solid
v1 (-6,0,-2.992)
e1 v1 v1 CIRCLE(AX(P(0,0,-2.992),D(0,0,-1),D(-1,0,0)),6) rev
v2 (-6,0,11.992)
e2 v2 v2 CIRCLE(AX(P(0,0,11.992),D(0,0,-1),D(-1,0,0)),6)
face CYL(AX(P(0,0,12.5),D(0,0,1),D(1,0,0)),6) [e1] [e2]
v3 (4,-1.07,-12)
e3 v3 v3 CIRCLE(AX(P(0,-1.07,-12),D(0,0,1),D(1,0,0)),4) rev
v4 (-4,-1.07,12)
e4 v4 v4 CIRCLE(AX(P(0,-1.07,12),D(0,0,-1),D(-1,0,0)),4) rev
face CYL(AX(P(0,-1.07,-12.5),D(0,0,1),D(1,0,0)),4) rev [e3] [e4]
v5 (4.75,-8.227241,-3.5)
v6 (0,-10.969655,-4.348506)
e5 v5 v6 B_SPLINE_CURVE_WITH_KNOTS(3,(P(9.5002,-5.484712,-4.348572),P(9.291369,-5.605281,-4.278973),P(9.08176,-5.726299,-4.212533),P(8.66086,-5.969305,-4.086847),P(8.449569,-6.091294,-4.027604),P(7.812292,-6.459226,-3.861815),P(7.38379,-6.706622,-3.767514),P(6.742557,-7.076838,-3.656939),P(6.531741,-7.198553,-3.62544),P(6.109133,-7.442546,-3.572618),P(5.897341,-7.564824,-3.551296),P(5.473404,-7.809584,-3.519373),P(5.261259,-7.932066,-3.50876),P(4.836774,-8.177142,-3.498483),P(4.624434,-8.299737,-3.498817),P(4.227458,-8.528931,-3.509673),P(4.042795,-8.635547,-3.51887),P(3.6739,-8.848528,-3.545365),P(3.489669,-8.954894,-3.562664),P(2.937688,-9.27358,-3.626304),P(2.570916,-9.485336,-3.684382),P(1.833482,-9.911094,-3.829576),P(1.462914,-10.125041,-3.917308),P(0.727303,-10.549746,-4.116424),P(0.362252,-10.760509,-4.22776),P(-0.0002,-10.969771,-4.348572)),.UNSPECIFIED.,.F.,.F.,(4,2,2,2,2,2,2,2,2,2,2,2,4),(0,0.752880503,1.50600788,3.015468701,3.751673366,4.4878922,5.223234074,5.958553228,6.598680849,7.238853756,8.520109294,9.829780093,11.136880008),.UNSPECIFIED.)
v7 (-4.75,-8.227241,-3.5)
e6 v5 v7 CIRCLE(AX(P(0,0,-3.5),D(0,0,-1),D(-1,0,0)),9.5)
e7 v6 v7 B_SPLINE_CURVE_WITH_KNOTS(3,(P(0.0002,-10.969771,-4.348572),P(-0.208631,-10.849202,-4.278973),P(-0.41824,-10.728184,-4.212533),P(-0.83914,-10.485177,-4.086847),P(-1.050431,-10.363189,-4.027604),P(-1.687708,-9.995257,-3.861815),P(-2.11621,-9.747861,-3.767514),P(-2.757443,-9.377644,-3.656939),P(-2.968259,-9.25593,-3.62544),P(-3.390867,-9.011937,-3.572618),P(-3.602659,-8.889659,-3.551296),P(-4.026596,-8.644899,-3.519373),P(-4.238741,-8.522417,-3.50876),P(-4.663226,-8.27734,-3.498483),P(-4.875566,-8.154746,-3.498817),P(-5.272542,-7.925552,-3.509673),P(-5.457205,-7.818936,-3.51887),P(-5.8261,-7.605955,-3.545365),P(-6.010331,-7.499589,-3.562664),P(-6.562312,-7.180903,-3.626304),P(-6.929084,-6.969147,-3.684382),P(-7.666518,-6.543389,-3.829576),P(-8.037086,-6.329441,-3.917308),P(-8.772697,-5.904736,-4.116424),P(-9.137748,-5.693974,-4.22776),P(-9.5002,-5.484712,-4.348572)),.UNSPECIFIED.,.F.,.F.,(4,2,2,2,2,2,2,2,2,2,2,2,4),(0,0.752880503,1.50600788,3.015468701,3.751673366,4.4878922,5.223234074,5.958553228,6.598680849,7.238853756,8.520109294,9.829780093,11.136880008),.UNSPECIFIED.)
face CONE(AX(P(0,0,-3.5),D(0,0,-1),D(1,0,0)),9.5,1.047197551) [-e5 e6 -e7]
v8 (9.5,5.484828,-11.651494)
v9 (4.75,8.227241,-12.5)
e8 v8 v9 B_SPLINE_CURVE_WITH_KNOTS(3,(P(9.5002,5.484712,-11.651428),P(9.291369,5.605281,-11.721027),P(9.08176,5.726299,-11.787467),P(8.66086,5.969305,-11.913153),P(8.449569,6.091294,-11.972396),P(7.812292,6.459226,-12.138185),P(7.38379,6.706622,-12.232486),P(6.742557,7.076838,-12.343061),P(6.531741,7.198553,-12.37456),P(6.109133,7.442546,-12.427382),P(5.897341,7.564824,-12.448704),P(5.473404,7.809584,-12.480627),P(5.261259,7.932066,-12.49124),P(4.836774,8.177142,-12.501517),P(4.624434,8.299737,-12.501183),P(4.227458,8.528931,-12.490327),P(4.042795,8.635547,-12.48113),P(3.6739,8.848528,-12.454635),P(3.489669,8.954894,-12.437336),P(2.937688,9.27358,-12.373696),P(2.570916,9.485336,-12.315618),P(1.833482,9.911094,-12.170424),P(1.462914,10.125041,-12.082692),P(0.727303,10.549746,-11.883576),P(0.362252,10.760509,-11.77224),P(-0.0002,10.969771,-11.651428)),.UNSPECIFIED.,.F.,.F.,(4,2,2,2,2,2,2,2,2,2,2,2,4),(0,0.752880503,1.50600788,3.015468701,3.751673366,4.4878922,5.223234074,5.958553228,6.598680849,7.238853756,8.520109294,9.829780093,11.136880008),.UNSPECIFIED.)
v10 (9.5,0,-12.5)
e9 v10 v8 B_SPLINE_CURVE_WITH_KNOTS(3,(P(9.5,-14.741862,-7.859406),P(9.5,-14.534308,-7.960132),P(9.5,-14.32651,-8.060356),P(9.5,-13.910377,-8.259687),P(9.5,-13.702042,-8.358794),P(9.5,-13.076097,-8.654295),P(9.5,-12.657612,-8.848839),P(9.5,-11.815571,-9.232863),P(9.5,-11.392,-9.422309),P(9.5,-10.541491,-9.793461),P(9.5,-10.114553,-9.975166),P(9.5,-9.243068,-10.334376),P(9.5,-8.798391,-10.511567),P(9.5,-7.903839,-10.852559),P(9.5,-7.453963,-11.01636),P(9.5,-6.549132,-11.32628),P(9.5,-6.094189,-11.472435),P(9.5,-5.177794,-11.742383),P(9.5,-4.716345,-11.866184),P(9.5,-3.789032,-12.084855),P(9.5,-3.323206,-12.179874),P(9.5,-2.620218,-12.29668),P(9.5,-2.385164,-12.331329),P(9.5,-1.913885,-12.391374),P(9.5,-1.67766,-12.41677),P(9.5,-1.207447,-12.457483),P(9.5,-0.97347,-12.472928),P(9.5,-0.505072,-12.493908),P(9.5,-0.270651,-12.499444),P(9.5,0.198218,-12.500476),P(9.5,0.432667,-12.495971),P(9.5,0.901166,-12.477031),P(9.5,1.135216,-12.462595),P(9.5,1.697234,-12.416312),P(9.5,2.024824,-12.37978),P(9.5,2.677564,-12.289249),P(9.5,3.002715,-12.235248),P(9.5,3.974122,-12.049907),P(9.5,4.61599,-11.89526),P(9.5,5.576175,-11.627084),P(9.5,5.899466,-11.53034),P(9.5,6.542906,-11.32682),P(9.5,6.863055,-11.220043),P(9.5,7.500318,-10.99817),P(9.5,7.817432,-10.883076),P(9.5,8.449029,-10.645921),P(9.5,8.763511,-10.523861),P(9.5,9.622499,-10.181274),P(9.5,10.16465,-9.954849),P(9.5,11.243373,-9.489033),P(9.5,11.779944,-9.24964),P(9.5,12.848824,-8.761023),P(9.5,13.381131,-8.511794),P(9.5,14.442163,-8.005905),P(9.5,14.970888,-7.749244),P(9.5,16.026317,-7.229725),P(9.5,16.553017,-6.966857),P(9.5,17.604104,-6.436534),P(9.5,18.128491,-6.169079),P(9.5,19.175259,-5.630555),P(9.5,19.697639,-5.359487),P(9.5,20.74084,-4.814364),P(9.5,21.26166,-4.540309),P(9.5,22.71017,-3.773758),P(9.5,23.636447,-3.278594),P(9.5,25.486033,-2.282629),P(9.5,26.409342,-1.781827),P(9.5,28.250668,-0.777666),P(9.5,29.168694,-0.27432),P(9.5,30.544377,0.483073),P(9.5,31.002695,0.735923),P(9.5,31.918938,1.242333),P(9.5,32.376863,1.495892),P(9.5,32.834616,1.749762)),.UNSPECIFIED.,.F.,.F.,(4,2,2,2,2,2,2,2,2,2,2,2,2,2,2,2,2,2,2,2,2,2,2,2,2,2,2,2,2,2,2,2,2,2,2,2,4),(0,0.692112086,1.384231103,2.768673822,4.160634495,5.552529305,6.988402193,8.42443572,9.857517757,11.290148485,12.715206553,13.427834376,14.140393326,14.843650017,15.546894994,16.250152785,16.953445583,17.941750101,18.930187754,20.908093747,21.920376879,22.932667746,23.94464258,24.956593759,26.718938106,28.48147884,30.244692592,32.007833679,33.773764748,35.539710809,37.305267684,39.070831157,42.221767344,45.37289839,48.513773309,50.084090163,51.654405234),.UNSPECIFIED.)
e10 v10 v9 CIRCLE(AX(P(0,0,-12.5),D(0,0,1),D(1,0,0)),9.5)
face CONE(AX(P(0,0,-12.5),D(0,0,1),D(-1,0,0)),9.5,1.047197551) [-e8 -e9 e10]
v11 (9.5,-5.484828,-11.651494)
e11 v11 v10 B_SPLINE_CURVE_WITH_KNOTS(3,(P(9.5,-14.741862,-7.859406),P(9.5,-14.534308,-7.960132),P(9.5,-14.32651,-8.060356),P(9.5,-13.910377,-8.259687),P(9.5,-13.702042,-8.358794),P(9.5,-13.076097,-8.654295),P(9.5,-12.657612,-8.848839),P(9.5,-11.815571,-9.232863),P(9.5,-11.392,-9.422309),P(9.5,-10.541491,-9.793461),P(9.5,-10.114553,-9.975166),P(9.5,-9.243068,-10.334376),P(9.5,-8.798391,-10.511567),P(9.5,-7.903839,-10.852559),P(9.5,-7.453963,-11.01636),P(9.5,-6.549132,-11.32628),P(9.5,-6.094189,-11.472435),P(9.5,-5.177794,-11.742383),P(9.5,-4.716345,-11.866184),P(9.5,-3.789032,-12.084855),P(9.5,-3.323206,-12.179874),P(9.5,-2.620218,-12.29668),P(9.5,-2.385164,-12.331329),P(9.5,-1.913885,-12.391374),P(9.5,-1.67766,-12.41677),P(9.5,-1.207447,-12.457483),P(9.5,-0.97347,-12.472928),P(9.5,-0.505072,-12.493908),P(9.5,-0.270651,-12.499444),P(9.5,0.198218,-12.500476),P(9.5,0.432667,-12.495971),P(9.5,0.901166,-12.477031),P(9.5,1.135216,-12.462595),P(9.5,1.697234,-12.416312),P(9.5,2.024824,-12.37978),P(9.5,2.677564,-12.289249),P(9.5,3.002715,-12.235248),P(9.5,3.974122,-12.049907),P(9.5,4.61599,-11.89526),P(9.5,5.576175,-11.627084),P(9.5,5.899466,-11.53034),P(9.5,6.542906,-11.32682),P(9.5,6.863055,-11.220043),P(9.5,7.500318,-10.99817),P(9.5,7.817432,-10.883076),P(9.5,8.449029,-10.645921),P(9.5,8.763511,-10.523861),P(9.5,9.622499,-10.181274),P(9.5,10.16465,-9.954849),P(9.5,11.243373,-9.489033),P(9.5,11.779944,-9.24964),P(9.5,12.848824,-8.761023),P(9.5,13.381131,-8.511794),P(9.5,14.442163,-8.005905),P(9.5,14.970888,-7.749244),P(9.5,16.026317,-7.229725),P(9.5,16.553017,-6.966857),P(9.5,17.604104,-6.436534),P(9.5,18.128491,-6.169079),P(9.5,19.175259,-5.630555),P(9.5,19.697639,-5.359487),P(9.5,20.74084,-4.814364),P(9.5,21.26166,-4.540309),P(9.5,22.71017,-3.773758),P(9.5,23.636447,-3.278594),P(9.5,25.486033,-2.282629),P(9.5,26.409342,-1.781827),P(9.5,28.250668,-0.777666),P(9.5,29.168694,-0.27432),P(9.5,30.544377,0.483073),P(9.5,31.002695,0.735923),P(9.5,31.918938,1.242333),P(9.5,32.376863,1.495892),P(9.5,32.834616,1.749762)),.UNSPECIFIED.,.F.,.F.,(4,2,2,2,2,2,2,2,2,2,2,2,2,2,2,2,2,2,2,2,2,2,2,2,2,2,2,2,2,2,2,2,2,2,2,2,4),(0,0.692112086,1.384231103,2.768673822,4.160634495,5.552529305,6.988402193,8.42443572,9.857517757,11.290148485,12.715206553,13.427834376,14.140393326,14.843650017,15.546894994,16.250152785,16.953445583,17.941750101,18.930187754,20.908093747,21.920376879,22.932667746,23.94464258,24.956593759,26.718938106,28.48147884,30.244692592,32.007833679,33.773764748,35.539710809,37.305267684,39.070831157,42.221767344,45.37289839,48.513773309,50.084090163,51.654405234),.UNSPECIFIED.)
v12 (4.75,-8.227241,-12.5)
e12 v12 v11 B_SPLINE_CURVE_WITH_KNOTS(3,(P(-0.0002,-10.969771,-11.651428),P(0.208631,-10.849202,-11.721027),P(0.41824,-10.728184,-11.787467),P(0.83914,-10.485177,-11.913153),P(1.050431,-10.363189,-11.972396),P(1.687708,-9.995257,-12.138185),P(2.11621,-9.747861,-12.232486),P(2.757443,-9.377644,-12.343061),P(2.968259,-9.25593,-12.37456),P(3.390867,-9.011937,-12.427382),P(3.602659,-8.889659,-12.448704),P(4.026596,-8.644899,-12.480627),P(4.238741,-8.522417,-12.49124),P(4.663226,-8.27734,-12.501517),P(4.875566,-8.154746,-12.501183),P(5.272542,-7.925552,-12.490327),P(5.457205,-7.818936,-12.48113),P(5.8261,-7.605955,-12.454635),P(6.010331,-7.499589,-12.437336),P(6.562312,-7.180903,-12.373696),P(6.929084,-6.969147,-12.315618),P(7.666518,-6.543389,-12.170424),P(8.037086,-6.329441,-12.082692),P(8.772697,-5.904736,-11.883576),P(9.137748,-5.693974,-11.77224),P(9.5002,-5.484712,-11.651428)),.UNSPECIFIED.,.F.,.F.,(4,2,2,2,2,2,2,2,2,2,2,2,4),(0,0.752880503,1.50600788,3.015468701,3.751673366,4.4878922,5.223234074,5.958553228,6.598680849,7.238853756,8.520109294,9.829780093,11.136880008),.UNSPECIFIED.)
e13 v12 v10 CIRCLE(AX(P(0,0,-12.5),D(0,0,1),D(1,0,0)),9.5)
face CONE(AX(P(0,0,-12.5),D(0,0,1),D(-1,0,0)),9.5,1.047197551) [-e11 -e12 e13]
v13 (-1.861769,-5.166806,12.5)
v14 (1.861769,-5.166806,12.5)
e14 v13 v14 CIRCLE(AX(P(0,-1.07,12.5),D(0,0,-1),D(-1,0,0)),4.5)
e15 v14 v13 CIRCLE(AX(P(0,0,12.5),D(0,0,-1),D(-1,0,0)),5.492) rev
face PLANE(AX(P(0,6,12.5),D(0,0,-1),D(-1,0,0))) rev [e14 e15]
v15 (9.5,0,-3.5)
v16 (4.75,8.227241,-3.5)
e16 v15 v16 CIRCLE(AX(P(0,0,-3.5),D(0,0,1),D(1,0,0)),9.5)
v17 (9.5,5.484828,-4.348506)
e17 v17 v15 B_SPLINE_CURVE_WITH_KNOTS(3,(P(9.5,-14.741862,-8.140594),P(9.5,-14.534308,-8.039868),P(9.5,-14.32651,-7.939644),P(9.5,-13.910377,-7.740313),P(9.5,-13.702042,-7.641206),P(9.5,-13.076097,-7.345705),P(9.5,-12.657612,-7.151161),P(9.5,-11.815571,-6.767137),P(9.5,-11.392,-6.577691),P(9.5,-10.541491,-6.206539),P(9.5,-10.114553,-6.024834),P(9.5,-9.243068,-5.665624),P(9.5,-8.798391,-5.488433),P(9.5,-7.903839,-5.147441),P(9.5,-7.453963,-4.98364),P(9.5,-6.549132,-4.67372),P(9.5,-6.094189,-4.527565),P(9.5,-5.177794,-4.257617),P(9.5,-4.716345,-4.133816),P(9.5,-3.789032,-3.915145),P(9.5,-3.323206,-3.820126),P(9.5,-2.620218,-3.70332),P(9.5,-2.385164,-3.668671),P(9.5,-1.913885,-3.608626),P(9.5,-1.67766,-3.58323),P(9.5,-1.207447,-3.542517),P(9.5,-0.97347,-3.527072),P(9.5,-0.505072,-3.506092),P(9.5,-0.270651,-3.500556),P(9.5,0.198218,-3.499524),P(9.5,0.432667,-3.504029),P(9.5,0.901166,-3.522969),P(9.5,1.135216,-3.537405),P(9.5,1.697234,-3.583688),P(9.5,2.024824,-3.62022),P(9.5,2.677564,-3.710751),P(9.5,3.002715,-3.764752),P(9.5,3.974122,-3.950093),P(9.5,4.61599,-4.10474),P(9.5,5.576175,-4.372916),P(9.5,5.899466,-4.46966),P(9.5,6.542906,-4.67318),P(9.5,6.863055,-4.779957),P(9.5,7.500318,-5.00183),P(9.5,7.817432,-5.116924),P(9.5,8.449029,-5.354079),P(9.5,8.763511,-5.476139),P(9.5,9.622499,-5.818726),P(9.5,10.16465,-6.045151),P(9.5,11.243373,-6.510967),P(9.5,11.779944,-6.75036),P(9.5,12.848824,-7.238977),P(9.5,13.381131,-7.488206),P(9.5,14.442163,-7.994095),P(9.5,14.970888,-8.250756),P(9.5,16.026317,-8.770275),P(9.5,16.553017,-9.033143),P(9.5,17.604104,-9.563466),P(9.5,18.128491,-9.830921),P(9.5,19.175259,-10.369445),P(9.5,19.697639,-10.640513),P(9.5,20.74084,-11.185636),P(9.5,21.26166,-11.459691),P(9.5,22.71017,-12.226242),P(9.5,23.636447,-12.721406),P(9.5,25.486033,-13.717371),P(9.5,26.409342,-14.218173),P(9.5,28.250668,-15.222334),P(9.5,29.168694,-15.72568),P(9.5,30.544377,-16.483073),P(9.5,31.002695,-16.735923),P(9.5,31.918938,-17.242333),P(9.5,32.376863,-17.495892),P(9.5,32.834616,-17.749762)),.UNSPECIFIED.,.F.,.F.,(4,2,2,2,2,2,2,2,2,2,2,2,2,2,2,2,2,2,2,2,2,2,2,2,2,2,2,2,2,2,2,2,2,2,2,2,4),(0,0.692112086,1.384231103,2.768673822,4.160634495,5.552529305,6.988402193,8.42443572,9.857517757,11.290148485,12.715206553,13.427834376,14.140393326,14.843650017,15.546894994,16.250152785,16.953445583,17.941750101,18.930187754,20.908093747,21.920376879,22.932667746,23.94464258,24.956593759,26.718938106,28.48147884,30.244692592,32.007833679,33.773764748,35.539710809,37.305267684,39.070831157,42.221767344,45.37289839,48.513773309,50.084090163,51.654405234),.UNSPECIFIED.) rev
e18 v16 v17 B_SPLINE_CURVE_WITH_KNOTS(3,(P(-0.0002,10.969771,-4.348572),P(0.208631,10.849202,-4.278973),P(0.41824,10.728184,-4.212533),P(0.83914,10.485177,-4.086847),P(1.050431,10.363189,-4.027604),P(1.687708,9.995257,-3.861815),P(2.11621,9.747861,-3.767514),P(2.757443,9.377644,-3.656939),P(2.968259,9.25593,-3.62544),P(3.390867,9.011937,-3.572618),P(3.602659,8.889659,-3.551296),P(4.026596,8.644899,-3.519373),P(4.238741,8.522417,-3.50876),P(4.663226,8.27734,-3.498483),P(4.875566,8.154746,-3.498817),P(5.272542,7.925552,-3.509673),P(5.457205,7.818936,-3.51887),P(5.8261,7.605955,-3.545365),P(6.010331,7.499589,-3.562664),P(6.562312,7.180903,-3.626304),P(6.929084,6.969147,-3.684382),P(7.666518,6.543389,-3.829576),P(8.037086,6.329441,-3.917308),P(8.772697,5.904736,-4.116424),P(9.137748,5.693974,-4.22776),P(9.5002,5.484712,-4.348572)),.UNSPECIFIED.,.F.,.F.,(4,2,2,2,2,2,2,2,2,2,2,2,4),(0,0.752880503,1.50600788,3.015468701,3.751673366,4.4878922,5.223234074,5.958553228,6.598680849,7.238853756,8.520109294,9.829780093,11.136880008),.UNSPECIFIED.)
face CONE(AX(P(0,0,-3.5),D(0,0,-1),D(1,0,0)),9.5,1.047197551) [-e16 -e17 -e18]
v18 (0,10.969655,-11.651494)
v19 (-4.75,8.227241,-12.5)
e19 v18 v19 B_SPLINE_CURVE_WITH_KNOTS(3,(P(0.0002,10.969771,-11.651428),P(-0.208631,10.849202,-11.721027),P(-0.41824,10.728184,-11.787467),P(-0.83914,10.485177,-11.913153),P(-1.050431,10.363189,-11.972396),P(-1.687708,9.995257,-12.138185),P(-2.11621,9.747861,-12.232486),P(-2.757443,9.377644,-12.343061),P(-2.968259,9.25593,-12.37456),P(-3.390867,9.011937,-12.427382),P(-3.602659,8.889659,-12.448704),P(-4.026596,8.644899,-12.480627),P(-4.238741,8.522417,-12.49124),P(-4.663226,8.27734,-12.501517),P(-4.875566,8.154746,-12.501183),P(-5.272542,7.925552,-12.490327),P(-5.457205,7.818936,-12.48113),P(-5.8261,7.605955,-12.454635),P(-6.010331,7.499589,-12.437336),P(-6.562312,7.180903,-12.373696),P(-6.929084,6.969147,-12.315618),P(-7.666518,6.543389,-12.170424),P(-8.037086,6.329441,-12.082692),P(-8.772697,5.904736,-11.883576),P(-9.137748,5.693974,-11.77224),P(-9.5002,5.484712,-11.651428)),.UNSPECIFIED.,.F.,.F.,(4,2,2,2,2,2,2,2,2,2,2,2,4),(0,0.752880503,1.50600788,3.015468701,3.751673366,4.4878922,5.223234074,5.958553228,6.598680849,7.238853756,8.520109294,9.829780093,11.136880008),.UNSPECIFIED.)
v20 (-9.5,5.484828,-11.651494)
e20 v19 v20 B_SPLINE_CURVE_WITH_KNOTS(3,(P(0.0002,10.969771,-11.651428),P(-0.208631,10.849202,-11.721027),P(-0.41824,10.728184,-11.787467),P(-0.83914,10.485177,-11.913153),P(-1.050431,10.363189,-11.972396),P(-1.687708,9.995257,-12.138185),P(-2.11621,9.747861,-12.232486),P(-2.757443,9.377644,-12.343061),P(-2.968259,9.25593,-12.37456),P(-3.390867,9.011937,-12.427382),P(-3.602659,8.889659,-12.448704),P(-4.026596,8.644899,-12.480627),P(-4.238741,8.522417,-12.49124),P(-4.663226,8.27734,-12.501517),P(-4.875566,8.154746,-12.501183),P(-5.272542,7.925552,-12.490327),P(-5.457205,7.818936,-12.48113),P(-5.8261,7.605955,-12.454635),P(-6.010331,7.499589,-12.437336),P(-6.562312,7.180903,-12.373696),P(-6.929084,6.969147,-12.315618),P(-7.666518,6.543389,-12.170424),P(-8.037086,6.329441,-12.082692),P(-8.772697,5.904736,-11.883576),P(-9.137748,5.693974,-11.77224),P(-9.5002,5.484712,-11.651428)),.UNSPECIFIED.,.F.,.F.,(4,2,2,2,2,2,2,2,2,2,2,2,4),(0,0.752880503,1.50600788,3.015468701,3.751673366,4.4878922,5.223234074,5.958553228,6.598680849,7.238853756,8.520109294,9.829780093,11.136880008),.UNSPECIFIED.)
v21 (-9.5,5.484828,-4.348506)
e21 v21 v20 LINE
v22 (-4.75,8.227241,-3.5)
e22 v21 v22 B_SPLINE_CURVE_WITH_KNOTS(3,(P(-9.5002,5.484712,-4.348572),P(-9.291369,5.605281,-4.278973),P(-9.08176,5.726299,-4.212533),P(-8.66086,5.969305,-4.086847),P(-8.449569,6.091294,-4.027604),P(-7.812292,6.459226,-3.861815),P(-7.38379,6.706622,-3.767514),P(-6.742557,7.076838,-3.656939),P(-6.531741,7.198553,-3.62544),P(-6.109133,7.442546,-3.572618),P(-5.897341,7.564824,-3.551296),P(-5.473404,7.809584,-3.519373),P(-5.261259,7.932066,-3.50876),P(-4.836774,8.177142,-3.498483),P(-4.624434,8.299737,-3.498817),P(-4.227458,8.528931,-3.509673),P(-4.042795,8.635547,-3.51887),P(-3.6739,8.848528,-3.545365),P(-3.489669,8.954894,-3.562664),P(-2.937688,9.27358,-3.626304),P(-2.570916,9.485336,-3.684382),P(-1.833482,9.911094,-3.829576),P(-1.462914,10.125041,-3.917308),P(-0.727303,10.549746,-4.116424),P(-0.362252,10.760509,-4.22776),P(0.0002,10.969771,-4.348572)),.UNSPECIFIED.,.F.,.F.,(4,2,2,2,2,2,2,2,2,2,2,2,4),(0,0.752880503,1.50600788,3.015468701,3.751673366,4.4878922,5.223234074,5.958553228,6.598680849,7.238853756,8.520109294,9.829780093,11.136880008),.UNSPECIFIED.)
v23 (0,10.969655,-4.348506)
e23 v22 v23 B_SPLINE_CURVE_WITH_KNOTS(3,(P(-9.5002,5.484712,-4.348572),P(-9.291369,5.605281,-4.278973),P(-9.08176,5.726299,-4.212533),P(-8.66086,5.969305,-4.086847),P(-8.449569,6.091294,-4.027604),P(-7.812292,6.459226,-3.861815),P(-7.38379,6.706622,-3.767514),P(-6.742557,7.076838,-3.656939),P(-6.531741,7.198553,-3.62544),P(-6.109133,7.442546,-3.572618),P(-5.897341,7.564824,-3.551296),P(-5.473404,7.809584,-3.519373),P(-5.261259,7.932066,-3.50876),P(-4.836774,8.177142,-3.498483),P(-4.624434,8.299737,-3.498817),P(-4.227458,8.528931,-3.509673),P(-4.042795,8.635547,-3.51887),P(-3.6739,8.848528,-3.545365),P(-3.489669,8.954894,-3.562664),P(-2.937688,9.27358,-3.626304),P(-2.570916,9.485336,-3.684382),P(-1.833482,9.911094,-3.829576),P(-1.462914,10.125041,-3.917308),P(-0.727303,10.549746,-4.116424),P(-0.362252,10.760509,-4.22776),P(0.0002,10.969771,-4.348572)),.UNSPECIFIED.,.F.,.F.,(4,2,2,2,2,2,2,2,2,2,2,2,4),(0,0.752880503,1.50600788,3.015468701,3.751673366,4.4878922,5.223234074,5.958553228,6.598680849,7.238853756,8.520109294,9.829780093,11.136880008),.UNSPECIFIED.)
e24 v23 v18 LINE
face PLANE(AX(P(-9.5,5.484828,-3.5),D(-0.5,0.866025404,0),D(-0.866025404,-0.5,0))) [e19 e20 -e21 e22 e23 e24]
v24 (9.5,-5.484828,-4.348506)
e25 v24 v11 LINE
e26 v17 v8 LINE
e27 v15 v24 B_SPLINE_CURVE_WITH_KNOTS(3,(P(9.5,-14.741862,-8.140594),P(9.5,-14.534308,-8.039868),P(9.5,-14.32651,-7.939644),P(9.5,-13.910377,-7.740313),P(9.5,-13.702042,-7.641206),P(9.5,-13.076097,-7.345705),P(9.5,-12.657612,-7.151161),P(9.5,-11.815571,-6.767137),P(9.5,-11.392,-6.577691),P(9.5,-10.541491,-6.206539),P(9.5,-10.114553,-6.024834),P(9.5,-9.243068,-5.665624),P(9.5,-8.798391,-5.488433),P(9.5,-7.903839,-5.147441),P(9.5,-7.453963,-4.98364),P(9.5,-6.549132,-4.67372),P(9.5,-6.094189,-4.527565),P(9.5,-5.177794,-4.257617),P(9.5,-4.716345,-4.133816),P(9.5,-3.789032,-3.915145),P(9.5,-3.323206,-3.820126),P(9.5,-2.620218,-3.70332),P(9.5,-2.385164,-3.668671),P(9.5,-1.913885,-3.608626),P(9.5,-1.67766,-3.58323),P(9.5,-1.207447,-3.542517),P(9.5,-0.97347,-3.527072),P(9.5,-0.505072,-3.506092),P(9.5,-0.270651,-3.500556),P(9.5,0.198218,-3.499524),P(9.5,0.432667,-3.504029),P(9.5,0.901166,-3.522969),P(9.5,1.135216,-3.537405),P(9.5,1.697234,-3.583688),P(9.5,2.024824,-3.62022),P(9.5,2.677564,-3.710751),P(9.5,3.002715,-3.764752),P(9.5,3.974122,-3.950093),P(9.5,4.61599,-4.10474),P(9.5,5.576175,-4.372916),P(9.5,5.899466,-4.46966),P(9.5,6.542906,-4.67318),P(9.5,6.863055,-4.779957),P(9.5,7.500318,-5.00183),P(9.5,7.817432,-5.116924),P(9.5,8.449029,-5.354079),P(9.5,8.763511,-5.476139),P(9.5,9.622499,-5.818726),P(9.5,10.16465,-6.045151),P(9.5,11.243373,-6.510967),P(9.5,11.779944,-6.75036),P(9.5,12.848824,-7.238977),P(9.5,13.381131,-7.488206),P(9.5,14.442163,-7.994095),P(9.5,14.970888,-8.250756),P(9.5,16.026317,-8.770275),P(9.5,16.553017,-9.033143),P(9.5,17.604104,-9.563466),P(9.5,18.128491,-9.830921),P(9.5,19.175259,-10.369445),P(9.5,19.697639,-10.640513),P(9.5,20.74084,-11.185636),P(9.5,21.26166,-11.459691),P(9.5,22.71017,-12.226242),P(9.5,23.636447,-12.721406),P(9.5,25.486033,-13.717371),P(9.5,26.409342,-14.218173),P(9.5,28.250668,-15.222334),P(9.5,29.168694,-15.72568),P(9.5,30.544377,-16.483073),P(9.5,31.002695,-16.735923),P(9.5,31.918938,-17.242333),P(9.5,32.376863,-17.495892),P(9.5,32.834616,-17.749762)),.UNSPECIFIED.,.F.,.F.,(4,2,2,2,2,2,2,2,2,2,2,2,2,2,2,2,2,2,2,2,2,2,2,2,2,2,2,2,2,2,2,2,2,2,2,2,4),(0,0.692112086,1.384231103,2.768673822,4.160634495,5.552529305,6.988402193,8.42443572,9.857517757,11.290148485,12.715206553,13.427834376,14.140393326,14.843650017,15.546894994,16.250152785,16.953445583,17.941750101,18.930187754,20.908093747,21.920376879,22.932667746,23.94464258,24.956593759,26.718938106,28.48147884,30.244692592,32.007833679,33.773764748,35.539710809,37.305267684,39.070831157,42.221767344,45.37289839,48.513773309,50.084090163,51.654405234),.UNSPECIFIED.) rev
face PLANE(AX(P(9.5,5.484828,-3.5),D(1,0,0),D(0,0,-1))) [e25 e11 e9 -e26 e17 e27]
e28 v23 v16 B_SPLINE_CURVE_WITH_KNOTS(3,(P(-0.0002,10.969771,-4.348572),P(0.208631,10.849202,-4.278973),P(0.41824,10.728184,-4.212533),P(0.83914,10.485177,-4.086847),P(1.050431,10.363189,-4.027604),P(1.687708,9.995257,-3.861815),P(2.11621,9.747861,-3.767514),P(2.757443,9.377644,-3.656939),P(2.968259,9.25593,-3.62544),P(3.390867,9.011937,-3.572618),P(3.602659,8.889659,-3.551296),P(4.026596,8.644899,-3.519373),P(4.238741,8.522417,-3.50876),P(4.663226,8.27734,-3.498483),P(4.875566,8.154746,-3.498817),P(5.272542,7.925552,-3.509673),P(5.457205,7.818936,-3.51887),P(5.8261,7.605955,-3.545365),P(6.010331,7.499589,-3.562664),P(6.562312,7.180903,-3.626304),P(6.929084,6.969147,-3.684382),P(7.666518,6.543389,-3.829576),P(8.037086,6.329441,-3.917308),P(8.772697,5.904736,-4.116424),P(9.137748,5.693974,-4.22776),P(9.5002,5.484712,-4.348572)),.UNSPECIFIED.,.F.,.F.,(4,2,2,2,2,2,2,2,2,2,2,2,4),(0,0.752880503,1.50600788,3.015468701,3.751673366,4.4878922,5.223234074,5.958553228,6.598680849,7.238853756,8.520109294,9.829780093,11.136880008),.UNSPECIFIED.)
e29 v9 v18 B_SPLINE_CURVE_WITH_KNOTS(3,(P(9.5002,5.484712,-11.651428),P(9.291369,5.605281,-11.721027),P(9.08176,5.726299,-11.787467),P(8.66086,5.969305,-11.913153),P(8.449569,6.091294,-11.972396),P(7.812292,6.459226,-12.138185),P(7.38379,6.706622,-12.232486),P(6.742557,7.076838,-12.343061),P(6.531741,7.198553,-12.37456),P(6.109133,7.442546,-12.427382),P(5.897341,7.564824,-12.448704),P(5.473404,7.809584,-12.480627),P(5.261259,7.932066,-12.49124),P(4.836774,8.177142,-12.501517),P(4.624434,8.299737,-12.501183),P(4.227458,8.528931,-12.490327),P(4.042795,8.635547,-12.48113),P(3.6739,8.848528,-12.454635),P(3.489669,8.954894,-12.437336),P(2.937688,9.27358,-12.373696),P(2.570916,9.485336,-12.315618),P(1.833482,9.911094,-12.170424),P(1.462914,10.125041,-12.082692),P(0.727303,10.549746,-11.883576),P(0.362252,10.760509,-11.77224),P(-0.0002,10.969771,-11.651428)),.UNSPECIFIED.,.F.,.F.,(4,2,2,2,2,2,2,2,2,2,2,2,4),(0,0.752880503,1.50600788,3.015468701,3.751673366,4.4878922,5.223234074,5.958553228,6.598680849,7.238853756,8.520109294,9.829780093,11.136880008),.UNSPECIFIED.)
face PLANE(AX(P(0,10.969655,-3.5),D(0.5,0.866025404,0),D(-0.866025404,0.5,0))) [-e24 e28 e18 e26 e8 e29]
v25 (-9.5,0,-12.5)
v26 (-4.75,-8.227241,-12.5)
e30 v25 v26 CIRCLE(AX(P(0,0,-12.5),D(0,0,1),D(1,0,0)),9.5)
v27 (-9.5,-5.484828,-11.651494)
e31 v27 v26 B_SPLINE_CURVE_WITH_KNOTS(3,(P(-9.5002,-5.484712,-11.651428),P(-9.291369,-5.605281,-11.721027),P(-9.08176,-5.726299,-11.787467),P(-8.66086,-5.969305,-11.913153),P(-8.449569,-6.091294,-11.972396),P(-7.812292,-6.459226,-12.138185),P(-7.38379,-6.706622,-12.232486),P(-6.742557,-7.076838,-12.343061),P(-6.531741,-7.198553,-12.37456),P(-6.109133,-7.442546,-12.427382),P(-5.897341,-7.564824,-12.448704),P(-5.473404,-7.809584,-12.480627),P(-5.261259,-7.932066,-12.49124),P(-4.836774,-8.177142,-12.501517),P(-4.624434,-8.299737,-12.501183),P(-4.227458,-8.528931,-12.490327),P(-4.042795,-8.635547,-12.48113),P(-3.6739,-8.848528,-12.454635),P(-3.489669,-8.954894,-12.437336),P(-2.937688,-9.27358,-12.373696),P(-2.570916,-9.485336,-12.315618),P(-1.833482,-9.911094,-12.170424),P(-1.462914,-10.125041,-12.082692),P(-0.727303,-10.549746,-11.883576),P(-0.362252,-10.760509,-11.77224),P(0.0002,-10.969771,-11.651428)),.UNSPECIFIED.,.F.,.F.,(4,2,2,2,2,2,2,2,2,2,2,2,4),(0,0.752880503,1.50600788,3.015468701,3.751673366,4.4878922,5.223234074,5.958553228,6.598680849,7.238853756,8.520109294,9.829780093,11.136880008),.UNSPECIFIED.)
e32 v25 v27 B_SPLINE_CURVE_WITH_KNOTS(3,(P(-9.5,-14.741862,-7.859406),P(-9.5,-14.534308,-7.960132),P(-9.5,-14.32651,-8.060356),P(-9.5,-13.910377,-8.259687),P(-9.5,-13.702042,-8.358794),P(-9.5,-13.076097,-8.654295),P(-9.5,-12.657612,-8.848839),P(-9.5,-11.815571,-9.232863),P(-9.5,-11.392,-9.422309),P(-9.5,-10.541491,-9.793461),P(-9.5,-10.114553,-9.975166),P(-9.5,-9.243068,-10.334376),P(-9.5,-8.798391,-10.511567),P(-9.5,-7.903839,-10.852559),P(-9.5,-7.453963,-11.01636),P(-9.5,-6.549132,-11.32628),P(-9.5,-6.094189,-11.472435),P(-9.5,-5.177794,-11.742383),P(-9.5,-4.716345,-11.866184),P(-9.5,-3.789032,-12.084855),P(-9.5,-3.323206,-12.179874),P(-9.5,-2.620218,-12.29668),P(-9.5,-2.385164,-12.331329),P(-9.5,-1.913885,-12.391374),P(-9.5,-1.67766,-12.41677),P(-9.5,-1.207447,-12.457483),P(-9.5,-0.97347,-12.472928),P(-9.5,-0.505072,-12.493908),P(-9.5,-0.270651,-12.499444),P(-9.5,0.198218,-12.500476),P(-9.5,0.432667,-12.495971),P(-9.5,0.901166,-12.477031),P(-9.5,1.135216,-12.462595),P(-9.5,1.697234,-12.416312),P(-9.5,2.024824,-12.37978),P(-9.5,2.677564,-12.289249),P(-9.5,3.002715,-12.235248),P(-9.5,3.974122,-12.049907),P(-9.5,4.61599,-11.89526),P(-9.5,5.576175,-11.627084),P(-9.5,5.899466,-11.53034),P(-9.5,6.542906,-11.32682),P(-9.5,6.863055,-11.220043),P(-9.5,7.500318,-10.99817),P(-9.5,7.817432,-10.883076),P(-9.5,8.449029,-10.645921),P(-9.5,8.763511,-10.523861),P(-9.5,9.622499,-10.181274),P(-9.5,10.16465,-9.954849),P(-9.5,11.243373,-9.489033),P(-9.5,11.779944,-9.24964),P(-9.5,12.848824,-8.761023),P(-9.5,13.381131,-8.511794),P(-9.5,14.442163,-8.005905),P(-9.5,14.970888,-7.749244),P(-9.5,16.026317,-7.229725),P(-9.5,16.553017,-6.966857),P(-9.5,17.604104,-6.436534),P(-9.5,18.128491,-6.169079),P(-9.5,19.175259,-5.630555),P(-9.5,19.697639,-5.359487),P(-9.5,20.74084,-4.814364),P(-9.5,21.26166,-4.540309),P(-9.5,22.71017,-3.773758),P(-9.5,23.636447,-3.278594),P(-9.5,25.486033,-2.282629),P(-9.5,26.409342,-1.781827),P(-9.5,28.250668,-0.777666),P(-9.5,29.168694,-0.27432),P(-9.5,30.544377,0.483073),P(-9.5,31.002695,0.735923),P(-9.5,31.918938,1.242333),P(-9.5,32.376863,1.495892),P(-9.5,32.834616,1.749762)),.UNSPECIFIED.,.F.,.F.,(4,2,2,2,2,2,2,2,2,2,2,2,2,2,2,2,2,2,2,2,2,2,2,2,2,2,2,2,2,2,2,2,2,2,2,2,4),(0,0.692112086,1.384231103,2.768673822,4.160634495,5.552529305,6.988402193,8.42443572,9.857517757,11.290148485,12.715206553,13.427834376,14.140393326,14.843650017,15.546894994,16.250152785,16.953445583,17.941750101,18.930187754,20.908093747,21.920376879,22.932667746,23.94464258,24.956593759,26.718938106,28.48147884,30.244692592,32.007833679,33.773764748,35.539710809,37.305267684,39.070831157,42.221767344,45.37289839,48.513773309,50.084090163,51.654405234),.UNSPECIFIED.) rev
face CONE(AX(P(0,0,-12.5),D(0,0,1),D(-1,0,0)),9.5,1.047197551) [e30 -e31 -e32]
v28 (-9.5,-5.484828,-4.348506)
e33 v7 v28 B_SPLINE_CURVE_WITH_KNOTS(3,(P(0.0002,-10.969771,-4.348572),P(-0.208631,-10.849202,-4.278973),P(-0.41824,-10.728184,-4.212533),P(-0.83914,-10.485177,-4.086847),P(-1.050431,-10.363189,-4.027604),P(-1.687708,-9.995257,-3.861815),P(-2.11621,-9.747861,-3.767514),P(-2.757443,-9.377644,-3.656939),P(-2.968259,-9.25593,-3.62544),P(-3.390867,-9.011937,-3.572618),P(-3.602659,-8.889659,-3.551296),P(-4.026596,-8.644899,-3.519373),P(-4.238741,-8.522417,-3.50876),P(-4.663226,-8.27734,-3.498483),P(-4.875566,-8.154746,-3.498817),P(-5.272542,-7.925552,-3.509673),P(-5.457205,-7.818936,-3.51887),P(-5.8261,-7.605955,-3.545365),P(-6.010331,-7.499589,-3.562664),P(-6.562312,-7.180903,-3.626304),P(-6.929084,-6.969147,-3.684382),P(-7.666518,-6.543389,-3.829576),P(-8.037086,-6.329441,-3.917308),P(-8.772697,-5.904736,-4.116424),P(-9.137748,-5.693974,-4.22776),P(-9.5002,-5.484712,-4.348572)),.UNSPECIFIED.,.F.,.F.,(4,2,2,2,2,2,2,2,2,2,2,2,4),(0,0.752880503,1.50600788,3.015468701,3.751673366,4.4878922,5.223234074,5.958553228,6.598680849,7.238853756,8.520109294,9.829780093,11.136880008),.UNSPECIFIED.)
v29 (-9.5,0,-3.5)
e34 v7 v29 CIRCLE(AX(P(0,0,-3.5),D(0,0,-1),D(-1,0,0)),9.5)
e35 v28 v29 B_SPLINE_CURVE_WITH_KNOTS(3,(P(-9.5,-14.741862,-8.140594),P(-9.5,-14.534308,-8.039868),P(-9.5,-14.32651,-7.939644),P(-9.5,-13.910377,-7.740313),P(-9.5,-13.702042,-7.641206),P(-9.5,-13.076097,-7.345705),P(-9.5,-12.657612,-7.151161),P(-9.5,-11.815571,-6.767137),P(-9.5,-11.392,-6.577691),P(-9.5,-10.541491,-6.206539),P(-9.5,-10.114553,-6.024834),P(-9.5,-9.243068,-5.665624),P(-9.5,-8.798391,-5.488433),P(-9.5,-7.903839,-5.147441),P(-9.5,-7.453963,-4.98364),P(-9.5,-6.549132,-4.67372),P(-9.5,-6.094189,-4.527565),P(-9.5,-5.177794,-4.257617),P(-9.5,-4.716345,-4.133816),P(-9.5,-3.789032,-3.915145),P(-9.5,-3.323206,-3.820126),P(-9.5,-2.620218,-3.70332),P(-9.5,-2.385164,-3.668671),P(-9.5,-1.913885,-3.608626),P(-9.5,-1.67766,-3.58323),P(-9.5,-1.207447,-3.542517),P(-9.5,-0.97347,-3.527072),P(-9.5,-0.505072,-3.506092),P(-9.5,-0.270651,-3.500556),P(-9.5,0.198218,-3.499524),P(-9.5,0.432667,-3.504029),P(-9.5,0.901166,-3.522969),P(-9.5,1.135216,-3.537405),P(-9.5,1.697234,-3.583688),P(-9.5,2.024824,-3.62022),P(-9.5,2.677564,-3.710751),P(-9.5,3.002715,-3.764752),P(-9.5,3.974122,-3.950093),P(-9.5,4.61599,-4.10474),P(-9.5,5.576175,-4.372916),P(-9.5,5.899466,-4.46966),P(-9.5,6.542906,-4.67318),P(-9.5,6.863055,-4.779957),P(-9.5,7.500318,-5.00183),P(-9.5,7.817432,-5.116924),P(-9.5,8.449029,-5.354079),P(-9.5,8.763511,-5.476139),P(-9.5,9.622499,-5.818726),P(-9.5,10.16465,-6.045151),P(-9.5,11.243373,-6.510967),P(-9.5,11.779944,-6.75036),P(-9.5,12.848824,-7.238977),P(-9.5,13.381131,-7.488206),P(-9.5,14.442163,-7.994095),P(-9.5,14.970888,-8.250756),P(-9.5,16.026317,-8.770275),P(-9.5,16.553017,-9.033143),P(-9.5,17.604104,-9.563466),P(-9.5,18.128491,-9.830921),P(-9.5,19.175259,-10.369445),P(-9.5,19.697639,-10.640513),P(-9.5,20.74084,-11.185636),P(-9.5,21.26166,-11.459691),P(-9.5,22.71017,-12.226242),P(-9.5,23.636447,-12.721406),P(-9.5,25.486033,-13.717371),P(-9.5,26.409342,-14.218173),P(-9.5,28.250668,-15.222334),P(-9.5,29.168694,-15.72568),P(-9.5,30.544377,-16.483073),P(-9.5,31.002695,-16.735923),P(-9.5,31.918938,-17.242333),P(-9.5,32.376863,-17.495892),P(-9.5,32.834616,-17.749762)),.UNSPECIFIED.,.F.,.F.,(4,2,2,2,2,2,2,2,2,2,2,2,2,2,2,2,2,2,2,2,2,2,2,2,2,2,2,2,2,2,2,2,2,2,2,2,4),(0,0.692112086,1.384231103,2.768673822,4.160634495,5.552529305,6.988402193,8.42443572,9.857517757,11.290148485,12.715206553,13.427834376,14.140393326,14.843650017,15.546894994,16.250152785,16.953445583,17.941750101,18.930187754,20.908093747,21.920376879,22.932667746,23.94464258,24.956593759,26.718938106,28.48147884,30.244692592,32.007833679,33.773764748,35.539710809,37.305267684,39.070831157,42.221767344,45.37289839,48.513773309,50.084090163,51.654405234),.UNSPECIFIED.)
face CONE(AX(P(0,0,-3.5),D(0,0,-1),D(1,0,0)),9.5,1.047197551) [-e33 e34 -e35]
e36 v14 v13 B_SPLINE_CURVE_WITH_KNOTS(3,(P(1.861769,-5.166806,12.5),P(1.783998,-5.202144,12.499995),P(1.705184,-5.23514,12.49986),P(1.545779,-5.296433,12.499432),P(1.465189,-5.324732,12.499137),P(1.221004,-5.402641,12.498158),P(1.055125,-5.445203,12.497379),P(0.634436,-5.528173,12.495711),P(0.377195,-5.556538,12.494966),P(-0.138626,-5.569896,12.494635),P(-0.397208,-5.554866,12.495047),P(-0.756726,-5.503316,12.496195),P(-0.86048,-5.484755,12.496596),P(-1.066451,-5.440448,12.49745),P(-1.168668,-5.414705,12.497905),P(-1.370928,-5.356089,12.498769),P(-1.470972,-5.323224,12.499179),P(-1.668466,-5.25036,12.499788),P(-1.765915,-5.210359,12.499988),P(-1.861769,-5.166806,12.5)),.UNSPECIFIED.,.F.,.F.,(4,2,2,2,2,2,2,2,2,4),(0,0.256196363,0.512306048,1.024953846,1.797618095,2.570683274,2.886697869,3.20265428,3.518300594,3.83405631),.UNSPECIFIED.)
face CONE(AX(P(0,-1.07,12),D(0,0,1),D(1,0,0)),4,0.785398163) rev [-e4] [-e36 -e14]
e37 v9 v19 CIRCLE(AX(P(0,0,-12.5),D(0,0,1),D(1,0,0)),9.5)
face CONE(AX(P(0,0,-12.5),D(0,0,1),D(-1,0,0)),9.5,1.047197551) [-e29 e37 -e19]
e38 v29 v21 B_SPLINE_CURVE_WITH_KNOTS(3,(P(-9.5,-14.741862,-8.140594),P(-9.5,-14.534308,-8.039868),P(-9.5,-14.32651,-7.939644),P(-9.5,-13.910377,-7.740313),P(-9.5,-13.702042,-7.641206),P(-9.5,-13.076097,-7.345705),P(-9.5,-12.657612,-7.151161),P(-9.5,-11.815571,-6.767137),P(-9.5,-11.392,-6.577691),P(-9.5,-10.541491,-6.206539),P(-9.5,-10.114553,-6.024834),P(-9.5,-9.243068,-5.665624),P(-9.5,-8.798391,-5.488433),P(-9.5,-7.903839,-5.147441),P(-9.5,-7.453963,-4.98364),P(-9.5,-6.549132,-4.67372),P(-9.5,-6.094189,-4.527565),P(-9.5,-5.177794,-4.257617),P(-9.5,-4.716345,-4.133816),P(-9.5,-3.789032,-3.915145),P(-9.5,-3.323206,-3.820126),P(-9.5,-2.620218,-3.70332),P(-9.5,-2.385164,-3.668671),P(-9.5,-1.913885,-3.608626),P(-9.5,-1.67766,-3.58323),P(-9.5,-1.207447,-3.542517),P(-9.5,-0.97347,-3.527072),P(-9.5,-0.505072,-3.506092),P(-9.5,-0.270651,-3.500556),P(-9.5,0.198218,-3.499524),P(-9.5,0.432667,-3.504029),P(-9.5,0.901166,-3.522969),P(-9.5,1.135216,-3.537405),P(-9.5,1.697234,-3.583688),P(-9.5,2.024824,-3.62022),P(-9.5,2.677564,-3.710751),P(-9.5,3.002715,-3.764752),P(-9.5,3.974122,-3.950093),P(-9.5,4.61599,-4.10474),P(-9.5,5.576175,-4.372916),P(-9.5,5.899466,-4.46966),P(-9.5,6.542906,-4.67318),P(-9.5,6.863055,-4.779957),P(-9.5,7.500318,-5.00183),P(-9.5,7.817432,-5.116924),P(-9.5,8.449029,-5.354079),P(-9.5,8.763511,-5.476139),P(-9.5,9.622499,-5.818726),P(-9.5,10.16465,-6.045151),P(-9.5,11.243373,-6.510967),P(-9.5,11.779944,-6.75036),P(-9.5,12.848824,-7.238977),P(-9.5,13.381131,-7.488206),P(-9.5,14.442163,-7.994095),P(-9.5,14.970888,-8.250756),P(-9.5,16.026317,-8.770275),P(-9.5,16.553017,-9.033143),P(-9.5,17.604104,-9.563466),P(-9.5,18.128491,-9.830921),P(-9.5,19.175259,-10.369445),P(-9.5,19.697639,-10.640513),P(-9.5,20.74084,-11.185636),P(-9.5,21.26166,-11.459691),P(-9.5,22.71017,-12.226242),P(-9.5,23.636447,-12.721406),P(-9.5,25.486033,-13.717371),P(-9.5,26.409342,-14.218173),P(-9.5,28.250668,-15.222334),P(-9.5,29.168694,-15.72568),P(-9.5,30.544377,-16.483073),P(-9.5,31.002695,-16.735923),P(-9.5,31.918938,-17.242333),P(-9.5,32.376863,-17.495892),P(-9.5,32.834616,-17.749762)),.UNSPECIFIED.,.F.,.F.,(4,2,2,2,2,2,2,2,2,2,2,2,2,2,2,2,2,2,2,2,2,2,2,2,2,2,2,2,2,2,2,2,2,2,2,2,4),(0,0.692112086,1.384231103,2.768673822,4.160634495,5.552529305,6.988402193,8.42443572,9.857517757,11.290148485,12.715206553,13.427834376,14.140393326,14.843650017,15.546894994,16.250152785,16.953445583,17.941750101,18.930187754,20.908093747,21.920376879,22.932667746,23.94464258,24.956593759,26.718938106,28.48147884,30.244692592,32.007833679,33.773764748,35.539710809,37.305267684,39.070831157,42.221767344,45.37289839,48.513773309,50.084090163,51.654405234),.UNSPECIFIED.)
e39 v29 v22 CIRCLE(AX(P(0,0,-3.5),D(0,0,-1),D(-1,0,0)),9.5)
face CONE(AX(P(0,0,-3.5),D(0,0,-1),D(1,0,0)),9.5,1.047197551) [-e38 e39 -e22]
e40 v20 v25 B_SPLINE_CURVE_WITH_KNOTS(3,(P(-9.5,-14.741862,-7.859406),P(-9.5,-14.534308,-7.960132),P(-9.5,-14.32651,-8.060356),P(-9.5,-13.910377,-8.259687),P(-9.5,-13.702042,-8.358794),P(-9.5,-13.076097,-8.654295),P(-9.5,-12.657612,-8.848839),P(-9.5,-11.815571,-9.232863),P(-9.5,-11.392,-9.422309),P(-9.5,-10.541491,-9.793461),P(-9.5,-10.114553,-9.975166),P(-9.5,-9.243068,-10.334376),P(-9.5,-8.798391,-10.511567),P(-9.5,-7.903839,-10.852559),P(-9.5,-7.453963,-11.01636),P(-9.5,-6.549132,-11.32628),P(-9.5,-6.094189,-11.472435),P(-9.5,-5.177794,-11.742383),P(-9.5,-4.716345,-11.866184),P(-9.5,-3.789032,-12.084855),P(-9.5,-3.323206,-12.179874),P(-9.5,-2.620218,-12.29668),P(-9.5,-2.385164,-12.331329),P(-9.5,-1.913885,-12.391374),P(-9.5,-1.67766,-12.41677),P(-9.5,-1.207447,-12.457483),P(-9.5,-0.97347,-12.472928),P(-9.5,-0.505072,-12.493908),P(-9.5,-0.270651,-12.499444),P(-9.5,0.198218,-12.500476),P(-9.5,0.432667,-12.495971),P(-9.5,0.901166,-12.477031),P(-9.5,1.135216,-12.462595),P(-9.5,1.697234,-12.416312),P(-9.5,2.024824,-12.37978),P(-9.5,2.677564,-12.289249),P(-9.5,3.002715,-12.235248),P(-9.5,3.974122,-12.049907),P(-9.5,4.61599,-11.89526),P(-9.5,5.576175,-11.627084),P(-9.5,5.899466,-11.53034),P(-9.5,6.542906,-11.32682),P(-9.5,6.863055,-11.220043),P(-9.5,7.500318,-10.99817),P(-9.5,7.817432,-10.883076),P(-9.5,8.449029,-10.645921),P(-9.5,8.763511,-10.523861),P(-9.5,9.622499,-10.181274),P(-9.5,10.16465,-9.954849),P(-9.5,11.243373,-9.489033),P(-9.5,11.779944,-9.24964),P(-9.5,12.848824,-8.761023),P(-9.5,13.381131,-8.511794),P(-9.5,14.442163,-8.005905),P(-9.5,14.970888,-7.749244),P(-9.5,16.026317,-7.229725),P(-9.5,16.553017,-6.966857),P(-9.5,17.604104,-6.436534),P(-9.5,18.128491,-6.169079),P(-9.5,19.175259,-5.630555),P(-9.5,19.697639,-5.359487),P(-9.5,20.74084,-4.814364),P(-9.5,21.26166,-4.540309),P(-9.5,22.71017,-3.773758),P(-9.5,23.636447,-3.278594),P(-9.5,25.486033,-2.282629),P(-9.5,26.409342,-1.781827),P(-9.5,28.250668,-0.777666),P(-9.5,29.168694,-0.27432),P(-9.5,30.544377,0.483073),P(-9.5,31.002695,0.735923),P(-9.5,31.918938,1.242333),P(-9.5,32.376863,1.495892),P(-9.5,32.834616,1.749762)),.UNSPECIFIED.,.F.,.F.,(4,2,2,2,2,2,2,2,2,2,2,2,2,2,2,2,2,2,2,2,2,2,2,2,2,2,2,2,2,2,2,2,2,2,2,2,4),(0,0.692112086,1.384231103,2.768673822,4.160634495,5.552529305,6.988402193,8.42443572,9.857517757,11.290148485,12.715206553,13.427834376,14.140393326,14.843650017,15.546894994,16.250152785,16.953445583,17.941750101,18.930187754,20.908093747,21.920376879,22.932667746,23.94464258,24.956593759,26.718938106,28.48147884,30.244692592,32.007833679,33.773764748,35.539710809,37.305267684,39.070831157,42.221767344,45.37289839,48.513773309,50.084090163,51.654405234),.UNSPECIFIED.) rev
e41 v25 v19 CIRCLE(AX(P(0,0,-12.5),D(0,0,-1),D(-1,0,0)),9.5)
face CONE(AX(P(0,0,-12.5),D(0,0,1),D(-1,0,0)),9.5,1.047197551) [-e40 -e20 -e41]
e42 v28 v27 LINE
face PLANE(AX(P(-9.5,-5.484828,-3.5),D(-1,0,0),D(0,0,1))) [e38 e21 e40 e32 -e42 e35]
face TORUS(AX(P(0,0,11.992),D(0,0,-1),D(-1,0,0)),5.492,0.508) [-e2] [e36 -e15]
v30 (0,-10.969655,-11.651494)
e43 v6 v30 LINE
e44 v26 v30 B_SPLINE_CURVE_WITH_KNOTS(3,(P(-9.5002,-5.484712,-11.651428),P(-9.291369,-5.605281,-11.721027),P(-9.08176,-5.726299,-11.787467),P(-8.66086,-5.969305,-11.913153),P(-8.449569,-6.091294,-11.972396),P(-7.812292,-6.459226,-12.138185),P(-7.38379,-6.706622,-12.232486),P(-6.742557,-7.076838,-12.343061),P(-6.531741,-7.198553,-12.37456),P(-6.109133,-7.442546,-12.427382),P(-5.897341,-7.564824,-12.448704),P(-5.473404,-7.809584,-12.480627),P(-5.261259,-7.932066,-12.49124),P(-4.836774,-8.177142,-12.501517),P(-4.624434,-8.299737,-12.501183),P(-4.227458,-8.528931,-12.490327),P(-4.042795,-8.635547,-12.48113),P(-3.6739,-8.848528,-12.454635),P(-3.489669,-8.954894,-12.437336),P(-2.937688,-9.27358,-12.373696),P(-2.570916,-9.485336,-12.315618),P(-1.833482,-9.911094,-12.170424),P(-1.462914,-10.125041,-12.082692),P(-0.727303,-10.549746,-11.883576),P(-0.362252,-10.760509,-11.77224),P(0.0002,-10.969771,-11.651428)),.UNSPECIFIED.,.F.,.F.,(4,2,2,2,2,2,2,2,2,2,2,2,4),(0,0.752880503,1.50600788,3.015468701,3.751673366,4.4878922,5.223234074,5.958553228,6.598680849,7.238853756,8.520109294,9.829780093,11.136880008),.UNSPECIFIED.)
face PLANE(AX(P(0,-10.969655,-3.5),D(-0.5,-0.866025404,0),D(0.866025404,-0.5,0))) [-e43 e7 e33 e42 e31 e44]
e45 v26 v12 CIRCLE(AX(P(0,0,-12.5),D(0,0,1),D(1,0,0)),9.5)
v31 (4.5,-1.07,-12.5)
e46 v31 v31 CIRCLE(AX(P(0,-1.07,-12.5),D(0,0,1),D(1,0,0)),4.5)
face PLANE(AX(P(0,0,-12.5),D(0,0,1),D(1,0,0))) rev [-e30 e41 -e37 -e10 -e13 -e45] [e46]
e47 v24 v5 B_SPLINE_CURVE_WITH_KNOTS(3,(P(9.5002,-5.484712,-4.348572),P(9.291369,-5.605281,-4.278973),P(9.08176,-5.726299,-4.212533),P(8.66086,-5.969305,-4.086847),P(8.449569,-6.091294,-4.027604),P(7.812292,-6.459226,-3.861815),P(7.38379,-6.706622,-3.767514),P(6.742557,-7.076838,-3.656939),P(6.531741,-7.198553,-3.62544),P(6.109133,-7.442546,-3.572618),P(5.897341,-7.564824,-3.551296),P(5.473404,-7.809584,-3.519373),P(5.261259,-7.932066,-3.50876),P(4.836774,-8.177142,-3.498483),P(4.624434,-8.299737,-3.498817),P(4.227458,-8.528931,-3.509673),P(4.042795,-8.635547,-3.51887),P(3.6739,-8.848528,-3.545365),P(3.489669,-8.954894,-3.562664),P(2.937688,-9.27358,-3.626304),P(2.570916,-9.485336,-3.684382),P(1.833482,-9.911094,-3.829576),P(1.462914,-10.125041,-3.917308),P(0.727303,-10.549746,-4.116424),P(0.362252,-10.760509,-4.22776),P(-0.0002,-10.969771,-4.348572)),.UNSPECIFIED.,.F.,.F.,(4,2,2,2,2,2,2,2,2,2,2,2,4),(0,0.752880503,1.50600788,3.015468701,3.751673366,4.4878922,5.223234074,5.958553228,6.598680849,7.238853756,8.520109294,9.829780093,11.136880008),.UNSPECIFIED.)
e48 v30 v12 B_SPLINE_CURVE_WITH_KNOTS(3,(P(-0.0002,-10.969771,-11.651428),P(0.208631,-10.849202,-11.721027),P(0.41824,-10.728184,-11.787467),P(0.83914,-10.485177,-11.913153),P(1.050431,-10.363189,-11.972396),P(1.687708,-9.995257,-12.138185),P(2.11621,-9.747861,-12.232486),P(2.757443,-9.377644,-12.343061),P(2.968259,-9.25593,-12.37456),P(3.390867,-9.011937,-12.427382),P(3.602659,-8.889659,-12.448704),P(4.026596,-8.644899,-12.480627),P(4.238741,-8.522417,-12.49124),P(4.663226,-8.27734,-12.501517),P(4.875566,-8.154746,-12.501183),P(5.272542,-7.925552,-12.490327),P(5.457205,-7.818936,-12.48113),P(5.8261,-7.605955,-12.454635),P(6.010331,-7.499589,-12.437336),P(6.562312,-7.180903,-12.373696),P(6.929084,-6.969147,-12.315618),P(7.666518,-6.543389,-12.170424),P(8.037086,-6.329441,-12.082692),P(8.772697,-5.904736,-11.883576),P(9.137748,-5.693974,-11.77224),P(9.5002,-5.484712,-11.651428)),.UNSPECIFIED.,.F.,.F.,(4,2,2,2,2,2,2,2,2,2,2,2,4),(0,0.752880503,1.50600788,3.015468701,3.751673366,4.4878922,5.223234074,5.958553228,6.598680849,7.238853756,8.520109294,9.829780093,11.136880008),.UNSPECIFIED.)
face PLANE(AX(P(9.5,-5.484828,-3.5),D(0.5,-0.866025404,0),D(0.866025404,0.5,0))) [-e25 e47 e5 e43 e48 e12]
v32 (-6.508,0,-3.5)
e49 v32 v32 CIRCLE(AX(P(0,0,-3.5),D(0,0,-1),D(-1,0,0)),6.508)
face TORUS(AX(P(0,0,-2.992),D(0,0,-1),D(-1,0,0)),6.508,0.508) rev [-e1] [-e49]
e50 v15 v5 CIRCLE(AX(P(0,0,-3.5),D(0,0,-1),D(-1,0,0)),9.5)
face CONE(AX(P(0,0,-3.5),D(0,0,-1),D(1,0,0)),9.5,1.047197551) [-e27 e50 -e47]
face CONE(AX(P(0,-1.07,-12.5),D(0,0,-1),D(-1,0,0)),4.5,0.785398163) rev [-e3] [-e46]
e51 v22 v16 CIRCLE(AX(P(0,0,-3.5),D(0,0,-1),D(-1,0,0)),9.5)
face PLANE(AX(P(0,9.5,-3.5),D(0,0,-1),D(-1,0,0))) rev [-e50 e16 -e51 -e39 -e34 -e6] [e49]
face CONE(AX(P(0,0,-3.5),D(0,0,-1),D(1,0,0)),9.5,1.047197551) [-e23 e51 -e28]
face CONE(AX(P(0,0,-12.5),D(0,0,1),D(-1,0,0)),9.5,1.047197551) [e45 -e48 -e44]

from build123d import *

# Parameters (mm, degrees)
HEX_EXTRUDE_DEPTH        = 9
SKETCH4_OUTSIDE_W        = 132.26
SKETCH4_OUTSIDE_H        = 135.2
SKETCH4_OUTSIDE_R        = 9.5
HEX_CUT1_DEPTH           = 29.906458333
HEX_CUT1_DRAFT           = -60
SKETCH5_OUTSIDE_W        = 106.952
SKETCH5_OUTSIDE_H        = 109.892
SKETCH5_OUTSIDE_R        = 9.5
HEX_CUT2_DEPTH           = 22.600540117
HEX_CUT2_DRAFT           = -60
SKETCH6_R                = 4
ECCENTRIC_HOLE_CUT_DEPTH = 29.906458333
FILLET_2_R               = 0.508
CHAMFER_2_SIZE           = 0.5


with BuildPart() as part:
    # Sketch2 → Body Revolve (revolve)
    with BuildSketch(Plane(origin=(0, 0, 0), x_dir=(0, 0, -1), z_dir=(1, 0, 0)), mode=Mode.PRIVATE) as body_revolve_sk:
        Polygon((-12.5, 0), (12.5, 0), (12.5, 9.5), (3.5, 9.5), (3.5, 6), (-12.5, 6), align=None)
    revolve(body_revolve_sk.sketch.rotate(Axis((0, 0, 12.5), (0, 0, -1)), 90), axis=Axis((0, 0, 12.5), (0, 0, -1)))

    # Sketch3 → Hex Extrude (add)
    with BuildSketch(Plane(origin=(0, 0, -12.5), x_dir=(-1, 0, 0), z_dir=(0, 0, -1))):
        Polygon((0, 10.969655115), (-9.5, 5.484827557), (-9.5, -5.484827557), (0, -10.969655115), (9.5, -5.484827557), (9.5, 5.484827557), align=None)
    extrude(amount=-HEX_EXTRUDE_DEPTH)


with BuildPart() as hex_cut1_tool:
    # Sketch4 outside → Hex Cut1 (with draft: the straight prism first)
    with BuildSketch(Plane(origin=(0, 0, -12.5), x_dir=(-1, 0, 0), z_dir=(0, 0, -1))):
        Rectangle(SKETCH4_OUTSIDE_W, SKETCH4_OUTSIDE_H)
        Circle(SKETCH4_OUTSIDE_R, mode=Mode.SUBTRACT)
    extrude(amount=-HEX_CUT1_DEPTH)
    # Hex Cut1: the draft: its side faces are tilted about the plane it starts from
    hex_cut1_sides = [hex_cut1_tool.faces().sort_by_distance(p)[0] for p in [
        (0, -67.6, 2.453229166),
        (-66.13, 0, 2.453229166),
        (0, 67.6, 2.453229166),
        (66.13, 0, 2.453229166),
        (9.5, 0, 2.453229166),
    ]]
    draft(hex_cut1_sides, Plane(origin=(0, 0, -12.5), x_dir=(-1, 0, 0), z_dir=(0, 0, -1)), HEX_CUT1_DRAFT)


with BuildPart() as part_1:
    add(part.part)

    # Hex Cut1: cut by hex_cut1_tool
    add(hex_cut1_tool.part, mode=Mode.SUBTRACT)


with BuildPart() as hex_cut2_tool:
    # Sketch5 outside → Hex Cut2 (with draft: the straight prism first)
    with BuildSketch(Plane.XY.offset(-3.5)):
        Rectangle(SKETCH5_OUTSIDE_W, SKETCH5_OUTSIDE_H)
        Circle(SKETCH5_OUTSIDE_R, mode=Mode.SUBTRACT)
    extrude(amount=-HEX_CUT2_DEPTH)
    # Hex Cut2: the draft: its side faces are tilted about the plane it starts from
    hex_cut2_sides = [hex_cut2_tool.faces().sort_by_distance(p)[0] for p in [
        (0, -54.946, -14.800270058),
        (53.476, 0, -14.800270058),
        (0, 54.946, -14.800270058),
        (-53.476, 0, -14.800270058),
        (-9.5, 0, -14.800270058),
    ]]
    draft(hex_cut2_sides, Plane.XY.offset(-3.5), HEX_CUT2_DRAFT)


with BuildPart() as part_2:
    add(part_1.part)

    # Hex Cut2: cut by hex_cut2_tool
    add(hex_cut2_tool.part, mode=Mode.SUBTRACT)

    # Sketch6 → Eccentric Hole Cut (cut, through all)
    with BuildSketch(Plane.XY.offset(12.5)):
        with Locations((0, -1.07)):
            Circle(SKETCH6_R)
    extrude(amount=-ECCENTRIC_HOLE_CUT_DEPTH, mode=Mode.SUBTRACT)

    # Fillet 2
    fillet_2_edges = [part_2.edges().sort_by_distance(p)[0] for p in [
        (-6, 0, 12.5),
        (-6, 0, -3.5),
    ]]
    fillet(fillet_2_edges, radius=FILLET_2_R)

    # Chamfer 2
    # the kernel refuses this chamfer: 0.5 mm, written as the material it takes off along each edge
    with BuildSketch(Plane(origin=(0, -1.07, -12.5), x_dir=(1, 0, 0), z_dir=(0, -1, 0))) as chamfer_2_piece_1:
        Polygon((4, CHAMFER_2_SIZE), (4 + CHAMFER_2_SIZE, 0), (4, 0), align=None)
    revolve(axis=Axis((0, -1.07, -12.5), (0, 0, 1)), mode=Mode.SUBTRACT)
    with BuildSketch(Plane(origin=(0, -1.07, 12.5), x_dir=(1, 0, 0), z_dir=(0, -1, 0))) as chamfer_2_piece_2:
        Polygon((4 + CHAMFER_2_SIZE, 0), (4, -CHAMFER_2_SIZE), (4, 0), align=None)
    revolve(axis=Axis((0, -1.07, 12.5), (0, 0, 1)), mode=Mode.SUBTRACT)


solid = part_2.part
